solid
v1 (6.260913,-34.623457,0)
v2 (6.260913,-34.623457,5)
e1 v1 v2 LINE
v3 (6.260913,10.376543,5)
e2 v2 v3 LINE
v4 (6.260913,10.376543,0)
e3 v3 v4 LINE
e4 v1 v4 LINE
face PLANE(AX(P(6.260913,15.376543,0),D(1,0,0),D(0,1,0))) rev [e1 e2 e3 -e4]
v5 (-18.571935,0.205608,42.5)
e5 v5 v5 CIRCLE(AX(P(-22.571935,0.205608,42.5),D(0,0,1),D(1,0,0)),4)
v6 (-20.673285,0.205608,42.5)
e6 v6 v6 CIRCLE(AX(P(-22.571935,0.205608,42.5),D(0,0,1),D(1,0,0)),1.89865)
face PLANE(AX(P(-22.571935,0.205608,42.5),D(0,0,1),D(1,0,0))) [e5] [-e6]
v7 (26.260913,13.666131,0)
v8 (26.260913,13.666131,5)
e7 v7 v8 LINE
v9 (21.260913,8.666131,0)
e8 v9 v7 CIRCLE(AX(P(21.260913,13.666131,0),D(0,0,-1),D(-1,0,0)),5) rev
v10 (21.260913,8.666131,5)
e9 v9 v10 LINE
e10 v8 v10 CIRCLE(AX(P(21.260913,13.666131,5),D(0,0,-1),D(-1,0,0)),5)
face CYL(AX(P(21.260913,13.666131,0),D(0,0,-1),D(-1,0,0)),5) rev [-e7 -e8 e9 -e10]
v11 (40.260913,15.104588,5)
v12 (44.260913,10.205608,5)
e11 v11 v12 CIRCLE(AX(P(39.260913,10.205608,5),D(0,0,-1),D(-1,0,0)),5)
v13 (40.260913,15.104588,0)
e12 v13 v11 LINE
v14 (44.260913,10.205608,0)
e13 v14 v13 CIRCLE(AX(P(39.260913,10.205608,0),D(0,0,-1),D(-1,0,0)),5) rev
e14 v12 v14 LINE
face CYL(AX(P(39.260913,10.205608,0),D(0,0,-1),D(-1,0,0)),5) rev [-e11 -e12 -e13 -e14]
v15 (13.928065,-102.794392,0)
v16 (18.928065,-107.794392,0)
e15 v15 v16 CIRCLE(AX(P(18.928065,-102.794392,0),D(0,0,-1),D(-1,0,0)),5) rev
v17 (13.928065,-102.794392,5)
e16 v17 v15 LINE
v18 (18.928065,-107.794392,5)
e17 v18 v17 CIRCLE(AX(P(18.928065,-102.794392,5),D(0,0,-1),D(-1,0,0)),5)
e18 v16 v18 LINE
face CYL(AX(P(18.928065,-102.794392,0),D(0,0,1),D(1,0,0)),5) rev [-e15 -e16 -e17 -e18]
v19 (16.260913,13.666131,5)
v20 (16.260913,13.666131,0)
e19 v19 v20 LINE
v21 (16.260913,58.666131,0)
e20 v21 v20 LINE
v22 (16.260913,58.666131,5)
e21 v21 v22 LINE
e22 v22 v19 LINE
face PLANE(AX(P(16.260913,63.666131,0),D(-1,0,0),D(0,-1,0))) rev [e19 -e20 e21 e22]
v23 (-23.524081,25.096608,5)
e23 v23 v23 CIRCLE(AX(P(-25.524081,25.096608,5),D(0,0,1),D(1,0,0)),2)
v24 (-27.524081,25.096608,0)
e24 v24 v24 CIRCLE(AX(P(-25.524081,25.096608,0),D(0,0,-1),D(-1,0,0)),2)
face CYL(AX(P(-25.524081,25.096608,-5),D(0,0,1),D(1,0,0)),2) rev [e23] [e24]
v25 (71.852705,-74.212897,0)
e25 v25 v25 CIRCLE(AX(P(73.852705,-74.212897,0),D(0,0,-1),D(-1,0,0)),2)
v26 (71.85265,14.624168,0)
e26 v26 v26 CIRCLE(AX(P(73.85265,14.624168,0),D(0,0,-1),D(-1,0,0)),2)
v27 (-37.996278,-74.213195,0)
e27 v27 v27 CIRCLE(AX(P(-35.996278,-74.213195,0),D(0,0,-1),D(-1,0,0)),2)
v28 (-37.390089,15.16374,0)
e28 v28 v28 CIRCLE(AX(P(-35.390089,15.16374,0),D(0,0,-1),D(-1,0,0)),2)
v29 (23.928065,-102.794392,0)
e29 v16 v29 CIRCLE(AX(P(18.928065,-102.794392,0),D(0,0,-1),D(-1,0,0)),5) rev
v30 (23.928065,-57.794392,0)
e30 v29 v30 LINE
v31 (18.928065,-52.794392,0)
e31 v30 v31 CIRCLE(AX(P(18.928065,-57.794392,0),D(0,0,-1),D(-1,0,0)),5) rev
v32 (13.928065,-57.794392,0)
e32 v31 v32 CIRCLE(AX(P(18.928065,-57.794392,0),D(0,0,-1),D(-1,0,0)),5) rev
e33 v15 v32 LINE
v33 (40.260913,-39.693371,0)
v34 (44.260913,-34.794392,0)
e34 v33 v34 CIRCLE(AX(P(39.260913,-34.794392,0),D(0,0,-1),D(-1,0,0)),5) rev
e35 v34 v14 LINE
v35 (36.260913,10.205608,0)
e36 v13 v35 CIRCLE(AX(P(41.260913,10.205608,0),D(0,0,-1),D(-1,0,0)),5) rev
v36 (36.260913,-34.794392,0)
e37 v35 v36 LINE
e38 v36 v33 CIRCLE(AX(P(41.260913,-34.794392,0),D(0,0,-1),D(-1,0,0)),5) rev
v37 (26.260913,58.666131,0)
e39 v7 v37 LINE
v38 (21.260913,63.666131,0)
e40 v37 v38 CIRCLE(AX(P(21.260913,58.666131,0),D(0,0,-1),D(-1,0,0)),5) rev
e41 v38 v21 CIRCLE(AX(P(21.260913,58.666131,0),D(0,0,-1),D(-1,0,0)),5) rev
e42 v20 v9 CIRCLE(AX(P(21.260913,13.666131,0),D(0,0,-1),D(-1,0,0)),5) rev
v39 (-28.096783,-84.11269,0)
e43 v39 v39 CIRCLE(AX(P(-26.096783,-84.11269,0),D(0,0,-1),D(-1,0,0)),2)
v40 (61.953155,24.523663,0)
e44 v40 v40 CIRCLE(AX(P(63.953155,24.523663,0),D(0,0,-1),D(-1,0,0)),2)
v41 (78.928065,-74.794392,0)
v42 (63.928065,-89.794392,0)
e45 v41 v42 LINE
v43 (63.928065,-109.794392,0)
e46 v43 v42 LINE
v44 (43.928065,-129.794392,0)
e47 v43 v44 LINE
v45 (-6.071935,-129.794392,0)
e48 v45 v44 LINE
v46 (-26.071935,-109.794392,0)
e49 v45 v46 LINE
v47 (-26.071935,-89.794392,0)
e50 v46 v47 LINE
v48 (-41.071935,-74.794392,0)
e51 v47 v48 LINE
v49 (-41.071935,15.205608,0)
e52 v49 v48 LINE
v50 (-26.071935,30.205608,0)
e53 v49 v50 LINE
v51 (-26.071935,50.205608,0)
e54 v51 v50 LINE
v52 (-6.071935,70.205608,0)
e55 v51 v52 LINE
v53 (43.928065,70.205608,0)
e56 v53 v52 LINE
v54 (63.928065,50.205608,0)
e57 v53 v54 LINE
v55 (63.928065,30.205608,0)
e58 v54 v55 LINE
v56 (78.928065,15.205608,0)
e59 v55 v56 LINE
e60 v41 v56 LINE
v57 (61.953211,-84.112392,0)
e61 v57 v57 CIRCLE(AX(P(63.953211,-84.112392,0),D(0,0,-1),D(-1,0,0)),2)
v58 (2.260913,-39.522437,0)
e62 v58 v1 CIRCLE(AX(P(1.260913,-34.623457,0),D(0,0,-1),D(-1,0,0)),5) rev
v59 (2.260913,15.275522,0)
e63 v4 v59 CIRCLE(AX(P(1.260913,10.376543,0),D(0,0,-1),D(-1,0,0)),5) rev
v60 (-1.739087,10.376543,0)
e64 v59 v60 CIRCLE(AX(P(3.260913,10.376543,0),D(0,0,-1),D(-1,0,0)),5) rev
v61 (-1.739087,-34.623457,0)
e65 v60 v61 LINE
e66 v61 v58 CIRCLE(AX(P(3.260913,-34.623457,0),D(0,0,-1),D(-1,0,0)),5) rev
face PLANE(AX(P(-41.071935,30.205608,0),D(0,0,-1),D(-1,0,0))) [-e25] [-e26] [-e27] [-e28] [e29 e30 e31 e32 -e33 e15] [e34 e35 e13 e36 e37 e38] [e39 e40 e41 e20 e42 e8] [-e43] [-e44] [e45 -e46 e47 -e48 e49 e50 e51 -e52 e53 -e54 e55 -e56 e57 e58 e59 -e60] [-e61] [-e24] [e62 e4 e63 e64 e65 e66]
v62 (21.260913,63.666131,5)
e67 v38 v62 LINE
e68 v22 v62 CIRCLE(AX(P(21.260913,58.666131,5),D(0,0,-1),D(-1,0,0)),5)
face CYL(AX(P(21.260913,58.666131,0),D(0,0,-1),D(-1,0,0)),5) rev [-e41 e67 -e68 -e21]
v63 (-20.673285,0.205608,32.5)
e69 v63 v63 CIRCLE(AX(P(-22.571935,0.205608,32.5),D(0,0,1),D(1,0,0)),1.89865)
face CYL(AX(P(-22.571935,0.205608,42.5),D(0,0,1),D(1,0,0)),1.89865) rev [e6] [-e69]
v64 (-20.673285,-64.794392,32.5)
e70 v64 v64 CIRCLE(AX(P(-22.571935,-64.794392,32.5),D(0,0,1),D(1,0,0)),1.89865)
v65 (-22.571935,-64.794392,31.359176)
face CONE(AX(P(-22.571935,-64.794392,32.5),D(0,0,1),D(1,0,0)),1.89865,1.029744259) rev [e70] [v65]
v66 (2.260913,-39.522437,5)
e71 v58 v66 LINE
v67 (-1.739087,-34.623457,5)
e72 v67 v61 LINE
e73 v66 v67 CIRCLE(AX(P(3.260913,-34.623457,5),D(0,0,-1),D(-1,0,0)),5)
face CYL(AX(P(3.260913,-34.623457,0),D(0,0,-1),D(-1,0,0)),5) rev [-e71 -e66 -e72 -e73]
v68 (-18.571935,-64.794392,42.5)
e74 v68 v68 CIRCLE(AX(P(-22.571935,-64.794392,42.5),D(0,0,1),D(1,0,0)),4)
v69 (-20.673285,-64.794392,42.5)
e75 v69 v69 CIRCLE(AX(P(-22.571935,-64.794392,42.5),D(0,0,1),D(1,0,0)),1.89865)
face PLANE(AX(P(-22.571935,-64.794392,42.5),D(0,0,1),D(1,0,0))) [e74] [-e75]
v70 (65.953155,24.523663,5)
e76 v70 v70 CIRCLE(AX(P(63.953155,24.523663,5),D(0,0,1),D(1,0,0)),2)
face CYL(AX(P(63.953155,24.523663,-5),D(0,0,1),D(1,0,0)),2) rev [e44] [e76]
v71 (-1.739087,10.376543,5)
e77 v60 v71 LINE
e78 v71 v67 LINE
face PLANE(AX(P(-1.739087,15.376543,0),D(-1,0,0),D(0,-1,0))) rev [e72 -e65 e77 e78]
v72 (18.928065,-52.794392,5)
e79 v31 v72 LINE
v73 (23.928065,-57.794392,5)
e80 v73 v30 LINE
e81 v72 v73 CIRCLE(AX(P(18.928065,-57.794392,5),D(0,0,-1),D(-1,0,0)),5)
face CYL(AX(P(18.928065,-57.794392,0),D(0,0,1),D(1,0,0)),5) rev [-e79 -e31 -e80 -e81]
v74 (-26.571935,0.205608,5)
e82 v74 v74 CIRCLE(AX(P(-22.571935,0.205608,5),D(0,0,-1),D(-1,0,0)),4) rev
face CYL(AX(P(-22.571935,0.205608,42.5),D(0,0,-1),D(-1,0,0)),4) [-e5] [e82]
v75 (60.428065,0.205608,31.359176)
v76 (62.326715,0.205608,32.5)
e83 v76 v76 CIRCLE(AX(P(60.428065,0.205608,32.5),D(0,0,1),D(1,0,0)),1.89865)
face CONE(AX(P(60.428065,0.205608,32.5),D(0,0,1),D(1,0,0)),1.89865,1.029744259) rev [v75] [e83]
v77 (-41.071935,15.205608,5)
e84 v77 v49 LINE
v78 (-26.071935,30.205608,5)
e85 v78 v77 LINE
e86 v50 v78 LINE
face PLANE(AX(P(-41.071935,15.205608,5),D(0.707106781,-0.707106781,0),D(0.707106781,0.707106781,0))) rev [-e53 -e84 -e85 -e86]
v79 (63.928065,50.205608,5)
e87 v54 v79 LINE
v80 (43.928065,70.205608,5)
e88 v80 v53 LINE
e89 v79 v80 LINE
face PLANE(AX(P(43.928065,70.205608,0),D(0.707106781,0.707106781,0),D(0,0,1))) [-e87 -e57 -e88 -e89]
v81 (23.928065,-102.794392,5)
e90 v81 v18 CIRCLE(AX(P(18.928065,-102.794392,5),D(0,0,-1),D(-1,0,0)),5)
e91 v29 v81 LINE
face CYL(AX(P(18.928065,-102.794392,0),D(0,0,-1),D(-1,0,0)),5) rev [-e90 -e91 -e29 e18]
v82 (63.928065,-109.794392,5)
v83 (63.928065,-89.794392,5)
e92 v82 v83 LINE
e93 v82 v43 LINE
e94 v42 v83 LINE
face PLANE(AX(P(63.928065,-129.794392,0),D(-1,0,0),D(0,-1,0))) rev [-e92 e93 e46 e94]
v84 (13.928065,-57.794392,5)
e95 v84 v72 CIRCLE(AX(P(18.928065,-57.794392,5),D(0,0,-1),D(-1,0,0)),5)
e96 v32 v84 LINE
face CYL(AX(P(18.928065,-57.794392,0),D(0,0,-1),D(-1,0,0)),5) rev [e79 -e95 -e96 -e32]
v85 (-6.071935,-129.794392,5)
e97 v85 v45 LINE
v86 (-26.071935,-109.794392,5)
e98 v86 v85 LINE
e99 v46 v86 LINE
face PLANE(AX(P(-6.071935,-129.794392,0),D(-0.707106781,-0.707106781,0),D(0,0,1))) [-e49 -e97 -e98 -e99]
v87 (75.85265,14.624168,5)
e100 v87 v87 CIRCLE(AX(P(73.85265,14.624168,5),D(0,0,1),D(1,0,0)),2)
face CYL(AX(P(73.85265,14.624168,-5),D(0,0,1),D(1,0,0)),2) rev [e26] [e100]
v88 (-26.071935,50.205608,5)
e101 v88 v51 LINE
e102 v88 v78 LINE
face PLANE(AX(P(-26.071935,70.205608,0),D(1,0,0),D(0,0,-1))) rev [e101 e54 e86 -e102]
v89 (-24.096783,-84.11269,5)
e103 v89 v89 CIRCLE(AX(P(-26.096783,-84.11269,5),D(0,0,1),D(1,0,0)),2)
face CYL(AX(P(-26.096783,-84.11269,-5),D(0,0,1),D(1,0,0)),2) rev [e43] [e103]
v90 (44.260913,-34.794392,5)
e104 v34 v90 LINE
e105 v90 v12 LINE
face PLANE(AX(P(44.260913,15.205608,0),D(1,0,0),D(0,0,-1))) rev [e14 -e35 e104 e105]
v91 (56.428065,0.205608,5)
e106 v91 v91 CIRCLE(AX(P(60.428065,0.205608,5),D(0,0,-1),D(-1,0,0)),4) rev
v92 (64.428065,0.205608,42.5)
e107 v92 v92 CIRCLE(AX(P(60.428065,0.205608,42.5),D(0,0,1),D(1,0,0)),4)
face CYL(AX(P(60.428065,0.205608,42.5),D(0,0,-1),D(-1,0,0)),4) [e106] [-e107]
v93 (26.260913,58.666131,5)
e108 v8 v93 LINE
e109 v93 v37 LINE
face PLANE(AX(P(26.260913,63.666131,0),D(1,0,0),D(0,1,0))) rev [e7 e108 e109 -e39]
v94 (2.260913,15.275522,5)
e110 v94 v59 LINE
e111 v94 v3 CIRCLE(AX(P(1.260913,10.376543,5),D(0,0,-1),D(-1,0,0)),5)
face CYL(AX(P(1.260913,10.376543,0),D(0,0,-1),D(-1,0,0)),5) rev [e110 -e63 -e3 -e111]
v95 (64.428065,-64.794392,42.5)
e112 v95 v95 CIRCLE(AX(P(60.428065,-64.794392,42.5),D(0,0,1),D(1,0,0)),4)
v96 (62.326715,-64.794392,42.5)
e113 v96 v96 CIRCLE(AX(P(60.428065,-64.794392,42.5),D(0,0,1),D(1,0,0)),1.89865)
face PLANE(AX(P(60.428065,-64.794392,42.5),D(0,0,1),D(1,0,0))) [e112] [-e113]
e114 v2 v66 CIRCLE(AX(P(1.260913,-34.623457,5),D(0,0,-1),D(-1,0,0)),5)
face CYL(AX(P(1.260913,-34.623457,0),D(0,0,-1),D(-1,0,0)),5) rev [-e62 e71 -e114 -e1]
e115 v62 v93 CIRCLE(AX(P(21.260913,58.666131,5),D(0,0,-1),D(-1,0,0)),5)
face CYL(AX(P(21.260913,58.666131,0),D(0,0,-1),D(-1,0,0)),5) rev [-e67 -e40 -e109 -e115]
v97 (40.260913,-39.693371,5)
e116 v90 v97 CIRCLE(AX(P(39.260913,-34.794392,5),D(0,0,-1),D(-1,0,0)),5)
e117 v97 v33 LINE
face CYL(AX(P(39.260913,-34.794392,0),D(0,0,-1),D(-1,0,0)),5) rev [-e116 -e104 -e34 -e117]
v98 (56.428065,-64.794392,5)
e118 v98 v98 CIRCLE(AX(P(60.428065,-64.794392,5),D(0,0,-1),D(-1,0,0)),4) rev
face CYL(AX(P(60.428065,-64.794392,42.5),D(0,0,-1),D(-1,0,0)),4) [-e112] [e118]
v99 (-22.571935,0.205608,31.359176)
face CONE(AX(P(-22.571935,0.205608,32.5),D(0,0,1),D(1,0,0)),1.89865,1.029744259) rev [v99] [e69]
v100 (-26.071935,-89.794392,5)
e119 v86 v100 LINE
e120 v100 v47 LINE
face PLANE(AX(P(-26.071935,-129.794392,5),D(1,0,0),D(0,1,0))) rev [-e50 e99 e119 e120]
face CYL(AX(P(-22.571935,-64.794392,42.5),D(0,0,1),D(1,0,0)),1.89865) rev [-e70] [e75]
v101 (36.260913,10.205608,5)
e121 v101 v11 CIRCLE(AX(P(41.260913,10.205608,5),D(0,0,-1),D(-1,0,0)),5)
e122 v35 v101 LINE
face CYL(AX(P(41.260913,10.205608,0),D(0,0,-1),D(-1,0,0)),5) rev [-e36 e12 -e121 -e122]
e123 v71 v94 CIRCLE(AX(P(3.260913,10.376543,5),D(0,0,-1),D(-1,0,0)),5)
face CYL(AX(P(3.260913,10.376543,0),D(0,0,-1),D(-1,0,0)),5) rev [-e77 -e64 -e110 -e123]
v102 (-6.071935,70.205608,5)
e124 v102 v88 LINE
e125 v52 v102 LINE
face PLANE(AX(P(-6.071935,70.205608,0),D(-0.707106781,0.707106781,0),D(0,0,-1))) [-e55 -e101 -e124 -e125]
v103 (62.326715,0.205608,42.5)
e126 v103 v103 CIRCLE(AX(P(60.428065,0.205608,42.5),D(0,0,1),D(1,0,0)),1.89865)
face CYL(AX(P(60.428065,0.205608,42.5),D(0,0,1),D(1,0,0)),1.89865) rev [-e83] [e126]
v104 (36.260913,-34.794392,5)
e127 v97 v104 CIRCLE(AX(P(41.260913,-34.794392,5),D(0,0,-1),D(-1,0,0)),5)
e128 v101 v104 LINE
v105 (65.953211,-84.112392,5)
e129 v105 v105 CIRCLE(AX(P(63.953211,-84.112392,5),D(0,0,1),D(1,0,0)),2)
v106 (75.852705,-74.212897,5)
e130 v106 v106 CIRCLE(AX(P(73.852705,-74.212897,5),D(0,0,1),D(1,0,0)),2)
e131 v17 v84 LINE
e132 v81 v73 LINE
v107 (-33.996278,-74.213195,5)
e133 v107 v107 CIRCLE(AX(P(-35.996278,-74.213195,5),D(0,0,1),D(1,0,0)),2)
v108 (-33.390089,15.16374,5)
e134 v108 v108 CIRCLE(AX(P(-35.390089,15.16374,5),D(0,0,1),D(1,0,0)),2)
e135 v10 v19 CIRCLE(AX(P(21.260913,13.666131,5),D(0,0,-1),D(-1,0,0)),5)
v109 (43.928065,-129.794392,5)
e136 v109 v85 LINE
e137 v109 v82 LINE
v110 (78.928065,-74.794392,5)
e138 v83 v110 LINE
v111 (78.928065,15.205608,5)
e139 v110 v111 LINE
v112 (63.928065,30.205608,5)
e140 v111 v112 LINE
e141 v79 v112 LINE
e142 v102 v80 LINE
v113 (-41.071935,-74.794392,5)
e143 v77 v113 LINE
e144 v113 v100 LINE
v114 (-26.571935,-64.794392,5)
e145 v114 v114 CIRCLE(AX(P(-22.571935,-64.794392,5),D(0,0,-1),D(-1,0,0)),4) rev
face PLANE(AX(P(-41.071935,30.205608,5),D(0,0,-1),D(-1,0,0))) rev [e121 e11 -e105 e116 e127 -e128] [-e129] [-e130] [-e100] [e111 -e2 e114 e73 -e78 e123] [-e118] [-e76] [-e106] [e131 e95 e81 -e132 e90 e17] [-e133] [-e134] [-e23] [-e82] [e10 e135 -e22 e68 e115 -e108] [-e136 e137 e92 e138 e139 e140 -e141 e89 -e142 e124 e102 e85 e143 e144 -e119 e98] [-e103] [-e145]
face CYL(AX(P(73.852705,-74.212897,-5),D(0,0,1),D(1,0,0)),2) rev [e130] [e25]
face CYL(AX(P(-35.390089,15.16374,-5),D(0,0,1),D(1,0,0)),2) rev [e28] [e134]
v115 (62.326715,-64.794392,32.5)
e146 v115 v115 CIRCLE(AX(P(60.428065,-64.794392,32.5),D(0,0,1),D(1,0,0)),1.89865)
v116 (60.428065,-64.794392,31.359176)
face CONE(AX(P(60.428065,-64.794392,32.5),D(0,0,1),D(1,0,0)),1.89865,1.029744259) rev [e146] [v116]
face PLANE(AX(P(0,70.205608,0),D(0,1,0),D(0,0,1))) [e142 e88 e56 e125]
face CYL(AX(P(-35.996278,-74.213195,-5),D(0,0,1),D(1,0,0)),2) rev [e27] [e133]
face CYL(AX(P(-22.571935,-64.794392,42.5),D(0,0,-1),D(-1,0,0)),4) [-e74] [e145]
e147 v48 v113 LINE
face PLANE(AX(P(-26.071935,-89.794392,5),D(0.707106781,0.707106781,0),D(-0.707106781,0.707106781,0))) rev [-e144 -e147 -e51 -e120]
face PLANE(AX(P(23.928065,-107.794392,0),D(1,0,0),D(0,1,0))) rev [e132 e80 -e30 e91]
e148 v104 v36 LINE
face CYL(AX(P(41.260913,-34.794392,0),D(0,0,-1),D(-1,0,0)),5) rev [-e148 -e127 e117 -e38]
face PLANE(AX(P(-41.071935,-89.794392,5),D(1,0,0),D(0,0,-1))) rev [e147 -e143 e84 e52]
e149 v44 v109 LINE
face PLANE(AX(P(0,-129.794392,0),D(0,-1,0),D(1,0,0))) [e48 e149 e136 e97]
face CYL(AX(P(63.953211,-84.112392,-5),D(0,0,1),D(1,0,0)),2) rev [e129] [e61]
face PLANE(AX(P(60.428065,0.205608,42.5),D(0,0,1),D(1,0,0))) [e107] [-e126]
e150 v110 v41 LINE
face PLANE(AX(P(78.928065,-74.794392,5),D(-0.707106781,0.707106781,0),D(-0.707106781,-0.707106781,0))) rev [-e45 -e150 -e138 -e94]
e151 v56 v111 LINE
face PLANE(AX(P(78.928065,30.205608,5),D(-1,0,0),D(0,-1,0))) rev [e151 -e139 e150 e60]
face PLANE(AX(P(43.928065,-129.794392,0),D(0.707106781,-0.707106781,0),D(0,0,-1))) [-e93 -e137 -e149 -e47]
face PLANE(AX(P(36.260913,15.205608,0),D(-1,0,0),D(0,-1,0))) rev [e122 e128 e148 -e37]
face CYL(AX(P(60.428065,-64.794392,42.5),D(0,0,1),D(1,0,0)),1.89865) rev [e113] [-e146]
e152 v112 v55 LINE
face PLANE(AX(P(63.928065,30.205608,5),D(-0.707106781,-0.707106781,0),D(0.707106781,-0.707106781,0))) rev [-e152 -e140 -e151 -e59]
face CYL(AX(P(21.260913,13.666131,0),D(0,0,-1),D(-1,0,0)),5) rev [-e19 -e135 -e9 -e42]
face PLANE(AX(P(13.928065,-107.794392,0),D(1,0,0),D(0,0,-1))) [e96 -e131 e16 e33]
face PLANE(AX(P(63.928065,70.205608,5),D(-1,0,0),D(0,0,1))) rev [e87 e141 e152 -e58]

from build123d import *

# Parameters (mm, degrees)
ESQUISSE1_W             = 120
ESQUISSE1_H             = 120
BOSS_EXTRU_2_DEPTH      = 5
ESQUISSE9_R             = 4
BOSS_EXTRU_4_DEPTH      = 37.5
CHANFREIN5_SIZE         = 15
CHANFREIN6_SIZE         = 15
CHANFREIN7_SIZE         = 15
CHANFREIN8_SIZE         = 15
D_GAGEMENT_61_D         = 3.7973
D_GAGEMENT_61_DEPTH     = 10
D_GAGEMENT_61_TIP       = 1.140824014
ESQUISSE21_W            = 90
ESQUISSE21_H            = 5
BOSS_EXTRU_7_DEPTH      = 40
ESQUISSE22_W            = 90
ESQUISSE22_H            = 5
BOSS_EXTRU_8_DEPTH      = 40
CHANFREIN23_SIZE        = 20
ESQUISSE23_R            = 2
ENL_V_MAT_EXTRU_1_DEPTH = 10
SKETCH1_W               = 10
SKETCH1_H               = 55
CUT_EXTRUDE2_DEPTH      = 5
FILLET2_R               = 5
FILLET3_R               = 5
SKETCH3_W               = 10
SKETCH3_H               = 55
CUT_EXTRUDE4_DEPTH      = 5
FILLET11_R              = 5
SKETCH4_W               = 8
SKETCH4_H               = 55
CUT_EXTRUDE5_DEPTH      = 5
FILLET12_R              = 5
SKETCH4_2_W             = 8
SKETCH4_2_H             = 55
CUT_EXTRUDE6_DEPTH      = 5
FILLET16_R              = 5
FILLET17_R              = 5


# Some blends are built 0.0001 mm under size
with BuildPart() as part:
    # Esquisse1 → Boss.-Extru.2 (new body)
    with BuildSketch(Plane.XY):
        with Locations((18.92806479, -29.794391972)):
            Rectangle(ESQUISSE1_W, ESQUISSE1_H)
    extrude(amount=BOSS_EXTRU_2_DEPTH)

    # Esquisse9 → Boss.-Extru.4 (add)
    with BuildSketch(Plane.XY.offset(5)):
        with Locations(Location((-22.57193521, -64.794391972, 0), (0, 0, 180))):
            Circle(ESQUISSE9_R)
        with Locations(Location((-22.57193521, 0.205608028, 0), (0, 0, 180))):
            Circle(ESQUISSE9_R)
        with Locations(Location((60.42806479, 0.205608028, 0), (0, 0, 180))):
            Circle(ESQUISSE9_R)
        with Locations(Location((60.42806479, -64.794391972, 0), (0, 0, 180))):
            Circle(ESQUISSE9_R)
    extrude(amount=BOSS_EXTRU_4_DEPTH)

    # Chanfrein5
    chanfrein5_edges = [part.edges().sort_by_distance(p)[0] for p in [
        (78.92806479, -89.794391972, 2.5),
    ]]
    chamfer(chanfrein5_edges, length=CHANFREIN5_SIZE)

    # Chanfrein6
    chanfrein6_edges = [part.edges().sort_by_distance(p)[0] for p in [
        (78.92806479, 30.205608028, 2.5),
    ]]
    chamfer(chanfrein6_edges, length=CHANFREIN6_SIZE)

    # Chanfrein7
    chanfrein7_edges = [part.edges().sort_by_distance(p)[0] for p in [
        (-41.07193521, 30.205608028, 2.5),
    ]]
    chamfer(chanfrein7_edges, length=CHANFREIN7_SIZE)

    # Chanfrein8
    chanfrein8_edges = [part.edges().sort_by_distance(p)[0] for p in [
        (-41.07193521, -89.794391972, 2.5),
    ]]
    chamfer(chanfrein8_edges, length=CHANFREIN8_SIZE)

    # Dégagement #61
    with Locations(Plane(origin=(-22.57193521, -64.794391972, 42.5), x_dir=(1, 0, 0), z_dir=(0, 0, 1))):
        with Locations((0, 0), (83, 0), (83, 65), (0, 65)):
            Hole(D_GAGEMENT_61_D / 2, depth=D_GAGEMENT_61_DEPTH)
            with Locations((0, 0, -(D_GAGEMENT_61_DEPTH + D_GAGEMENT_61_TIP / 2))):  # 118° drill point
                Cone(0, D_GAGEMENT_61_D / 2, D_GAGEMENT_61_TIP, mode=Mode.SUBTRACT)

    # Esquisse21 → Boss.-Extru.7 (add)
    with BuildSketch(Plane(origin=(0, -89.794391972, 0), x_dir=(-1, 0, 0), z_dir=(0, -1, 0))):
        with Locations((-18.92806479, -2.5)):
            Rectangle(ESQUISSE21_W, ESQUISSE21_H)
    extrude(amount=BOSS_EXTRU_7_DEPTH)

    # Esquisse22 → Boss.-Extru.8 (add)
    with BuildSketch(Plane(origin=(0, 30.205608028, 0), x_dir=(1, 0, 0), z_dir=(0, 1, 0))):
        with Locations((18.92806479, -2.5)):
            Rectangle(ESQUISSE22_W, ESQUISSE22_H)
    extrude(amount=BOSS_EXTRU_8_DEPTH)

    # Chanfrein23
    chanfrein23_edges = [part.edges().sort_by_distance(p)[0] for p in [
        (-26.07193521, -129.794391972, 2.5),
        (63.92806479, -129.794391972, 2.5),
        (63.92806479, 70.205608028, 2.5),
        (-26.07193521, 70.205608028, 2.5),
    ]]
    chamfer(chanfrein23_edges, length=CHANFREIN23_SIZE)

    # Esquisse23 → Enlèv. mat.-Extru.1 (cut)
    with BuildSketch(Plane.XY.offset(5)):
        with Locations((-35.996277988, -74.213194945)):
            Circle(ESQUISSE23_R)
        with Locations((-26.096783051, -84.112689881)):
            Circle(ESQUISSE23_R)
        with Locations((-25.52408096, 25.096608028)):
            Circle(ESQUISSE23_R)
        with Locations((-35.390089468, 15.163739554)):
            Circle(ESQUISSE23_R)
        with Locations((63.953155144, 24.523663425)):
            Circle(ESQUISSE23_R)
        with Locations((73.85265008, 14.624168488)):
            Circle(ESQUISSE23_R)
        with Locations((63.953210541, -84.112391972)):
            Circle(ESQUISSE23_R)
        with Locations((73.852705477, -74.212897035)):
            Circle(ESQUISSE23_R)
    extrude(amount=-ENL_V_MAT_EXTRU_1_DEPTH, mode=Mode.SUBTRACT)

    # Sketch1 → Cut-Extrude2 (cut)
    with BuildSketch(Plane.XY.offset(5)):
        with Locations((18.92806479, -80.294391972)):
            Rectangle(SKETCH1_W, SKETCH1_H)
    extrude(amount=-CUT_EXTRUDE2_DEPTH, mode=Mode.SUBTRACT)

    # Fillet2
    fillet2_edges = [part.edges().sort_by_distance(p)[0] for p in [
        (13.92806479, -107.794391972, 2.5),
    ]]
    fillet(fillet2_edges, radius=FILLET2_R)

    # Fillet3
    fillet3_edges = [part.edges().sort_by_distance(p)[0] for p in [
        (13.92806479, -52.794391972, 2.5),
        (23.92806479, -52.794391972, 2.5),
        (23.92806479, -107.794391972, 2.5),
    ]]
    fillet(fillet3_edges, radius=FILLET3_R - 0.0001)  # a hair under: the kernel refuses the full size

    # Sketch3 → Cut-Extrude4 (cut)
    with BuildSketch(Plane.XY.offset(5)):
        with Locations((21.260912997, 36.166130895)):
            Rectangle(SKETCH3_W, SKETCH3_H)
    extrude(amount=-CUT_EXTRUDE4_DEPTH, mode=Mode.SUBTRACT)

    # Fillet11
    fillet11_edges = [part.edges().sort_by_distance(p)[0] for p in [
        (16.260912997, 63.666130895, 2.5),
        (26.260912997, 63.666130895, 2.5),
        (26.260912997, 8.666130895, 2.5),
        (16.260912997, 8.666130895, 2.5),
    ]]
    fillet(fillet11_edges, radius=FILLET11_R - 0.0001)  # a hair under: the kernel refuses the full size

    # Sketch4 → Cut-Extrude5 (cut)
    with BuildSketch(Plane.XY.offset(5)):
        with Locations((2.260912997, -12.123457497)):
            Rectangle(SKETCH4_W, SKETCH4_H)
        with Locations((40.260912997, -12.294391972)):
            Rectangle(SKETCH4_W, SKETCH4_H)
    extrude(amount=-CUT_EXTRUDE5_DEPTH, mode=Mode.SUBTRACT)

    # Fillet12
    # the kernel refuses this fillet: 5 mm, written as the material it adds along each edge
    with BuildSketch(Plane(origin=(44.260912997, 15.205608028, 5), x_dir=(0, -1, 0), z_dir=(0, 0, -1))) as fillet12_piece_1:
        with BuildLine():
            CenterArc((FILLET12_R, FILLET12_R), FILLET12_R, 180, 90)
            Line((0, FILLET12_R), (0, 0))
            Line((0, 0), (FILLET12_R, 0))
        make_face()
    extrude(amount=5)
    with BuildSketch(Plane(origin=(44.260912997, -39.794391972, 5), x_dir=(0, 1, 0), z_dir=(0, 0, -1)), Plane(origin=(36.260912997, 15.205608028, 5), x_dir=(0, -1, 0), z_dir=(0, 0, -1)), Plane(origin=(36.260912997, -39.794391972, 5), x_dir=(1, 0, 0), z_dir=(0, 0, -1))) as fillet12_piece_2:
        with BuildLine():
            CenterArc((FILLET12_R, -FILLET12_R), FILLET12_R, 90, 90)
            Line((0, -FILLET12_R), (0, 0))
            Line((0, 0), (FILLET12_R, 0))
        make_face()
    extrude(amount=5)

    # Sketch4<2> → Cut-Extrude6 (cut)
    with BuildSketch(Plane.XY.offset(5)):
        with Locations((2.260912997, -12.123457497)):
            Rectangle(SKETCH4_2_W, SKETCH4_2_H)
        with Locations((40.260912997, -12.294391972)):
            Rectangle(SKETCH4_2_W, SKETCH4_2_H)
    extrude(amount=-CUT_EXTRUDE6_DEPTH, mode=Mode.SUBTRACT)

    # Fillet16
    # the kernel refuses this fillet: 5 mm, written as the material it adds along each edge
    with BuildSketch(Plane(origin=(6.260912997, -39.623457497, 5), x_dir=(-1, 0, 0), z_dir=(0, 0, -1)), Plane(origin=(-1.739087003, 15.376542503, 5), x_dir=(1, 0, 0), z_dir=(0, 0, -1)), Plane(origin=(-1.739087003, -39.623457497, 5), x_dir=(0, 1, 0), z_dir=(0, 0, -1))) as fillet16_piece_1:
        with BuildLine():
            CenterArc((FILLET16_R, FILLET16_R), FILLET16_R, 180, 90)
            Line((0, FILLET16_R), (0, 0))
            Line((0, 0), (FILLET16_R, 0))
        make_face()
    extrude(amount=5)
    with BuildSketch(Plane(origin=(6.260912997, 15.376542503, 5), x_dir=(-1, 0, 0), z_dir=(0, 0, -1))) as fillet16_piece_2:
        with BuildLine():
            CenterArc((FILLET16_R, -FILLET16_R), FILLET16_R, 90, 90)
            Line((0, -FILLET16_R), (0, 0))
            Line((0, 0), (FILLET16_R, 0))
        make_face()
    extrude(amount=5)

    # Fillet17
    # the kernel refuses this fillet: 5 mm, written as the material it adds along each edge
    with BuildSketch(Plane(origin=(36.260912997, 15.205608028, 5), x_dir=(1, 0, 0), z_dir=(0, 0, -1)), Plane(origin=(36.260912997, -39.794391972, 5), x_dir=(0, 1, 0), z_dir=(0, 0, -1))) as fillet17_piece_1:
        with BuildLine():
            CenterArc((FILLET17_R, FILLET17_R), FILLET17_R, 180, 90)
            Line((0, FILLET17_R), (0, 0))
            Line((0, 0), (FILLET17_R, 0))
        make_face()
    extrude(amount=5)
    with BuildSketch(Plane(origin=(44.260912997, 15.205608028, 5), x_dir=(-1, 0, 0), z_dir=(0, 0, -1)), Plane(origin=(44.260912997, -39.794391972, 5), x_dir=(0, 1, 0), z_dir=(0, 0, -1))) as fillet17_piece_2:
        with BuildLine():
            CenterArc((FILLET17_R, -FILLET17_R), FILLET17_R, 90, 90)
            Line((0, -FILLET17_R), (0, 0))
            Line((0, 0), (FILLET17_R, 0))
        make_face()
    extrude(amount=5)


solid = part.part
